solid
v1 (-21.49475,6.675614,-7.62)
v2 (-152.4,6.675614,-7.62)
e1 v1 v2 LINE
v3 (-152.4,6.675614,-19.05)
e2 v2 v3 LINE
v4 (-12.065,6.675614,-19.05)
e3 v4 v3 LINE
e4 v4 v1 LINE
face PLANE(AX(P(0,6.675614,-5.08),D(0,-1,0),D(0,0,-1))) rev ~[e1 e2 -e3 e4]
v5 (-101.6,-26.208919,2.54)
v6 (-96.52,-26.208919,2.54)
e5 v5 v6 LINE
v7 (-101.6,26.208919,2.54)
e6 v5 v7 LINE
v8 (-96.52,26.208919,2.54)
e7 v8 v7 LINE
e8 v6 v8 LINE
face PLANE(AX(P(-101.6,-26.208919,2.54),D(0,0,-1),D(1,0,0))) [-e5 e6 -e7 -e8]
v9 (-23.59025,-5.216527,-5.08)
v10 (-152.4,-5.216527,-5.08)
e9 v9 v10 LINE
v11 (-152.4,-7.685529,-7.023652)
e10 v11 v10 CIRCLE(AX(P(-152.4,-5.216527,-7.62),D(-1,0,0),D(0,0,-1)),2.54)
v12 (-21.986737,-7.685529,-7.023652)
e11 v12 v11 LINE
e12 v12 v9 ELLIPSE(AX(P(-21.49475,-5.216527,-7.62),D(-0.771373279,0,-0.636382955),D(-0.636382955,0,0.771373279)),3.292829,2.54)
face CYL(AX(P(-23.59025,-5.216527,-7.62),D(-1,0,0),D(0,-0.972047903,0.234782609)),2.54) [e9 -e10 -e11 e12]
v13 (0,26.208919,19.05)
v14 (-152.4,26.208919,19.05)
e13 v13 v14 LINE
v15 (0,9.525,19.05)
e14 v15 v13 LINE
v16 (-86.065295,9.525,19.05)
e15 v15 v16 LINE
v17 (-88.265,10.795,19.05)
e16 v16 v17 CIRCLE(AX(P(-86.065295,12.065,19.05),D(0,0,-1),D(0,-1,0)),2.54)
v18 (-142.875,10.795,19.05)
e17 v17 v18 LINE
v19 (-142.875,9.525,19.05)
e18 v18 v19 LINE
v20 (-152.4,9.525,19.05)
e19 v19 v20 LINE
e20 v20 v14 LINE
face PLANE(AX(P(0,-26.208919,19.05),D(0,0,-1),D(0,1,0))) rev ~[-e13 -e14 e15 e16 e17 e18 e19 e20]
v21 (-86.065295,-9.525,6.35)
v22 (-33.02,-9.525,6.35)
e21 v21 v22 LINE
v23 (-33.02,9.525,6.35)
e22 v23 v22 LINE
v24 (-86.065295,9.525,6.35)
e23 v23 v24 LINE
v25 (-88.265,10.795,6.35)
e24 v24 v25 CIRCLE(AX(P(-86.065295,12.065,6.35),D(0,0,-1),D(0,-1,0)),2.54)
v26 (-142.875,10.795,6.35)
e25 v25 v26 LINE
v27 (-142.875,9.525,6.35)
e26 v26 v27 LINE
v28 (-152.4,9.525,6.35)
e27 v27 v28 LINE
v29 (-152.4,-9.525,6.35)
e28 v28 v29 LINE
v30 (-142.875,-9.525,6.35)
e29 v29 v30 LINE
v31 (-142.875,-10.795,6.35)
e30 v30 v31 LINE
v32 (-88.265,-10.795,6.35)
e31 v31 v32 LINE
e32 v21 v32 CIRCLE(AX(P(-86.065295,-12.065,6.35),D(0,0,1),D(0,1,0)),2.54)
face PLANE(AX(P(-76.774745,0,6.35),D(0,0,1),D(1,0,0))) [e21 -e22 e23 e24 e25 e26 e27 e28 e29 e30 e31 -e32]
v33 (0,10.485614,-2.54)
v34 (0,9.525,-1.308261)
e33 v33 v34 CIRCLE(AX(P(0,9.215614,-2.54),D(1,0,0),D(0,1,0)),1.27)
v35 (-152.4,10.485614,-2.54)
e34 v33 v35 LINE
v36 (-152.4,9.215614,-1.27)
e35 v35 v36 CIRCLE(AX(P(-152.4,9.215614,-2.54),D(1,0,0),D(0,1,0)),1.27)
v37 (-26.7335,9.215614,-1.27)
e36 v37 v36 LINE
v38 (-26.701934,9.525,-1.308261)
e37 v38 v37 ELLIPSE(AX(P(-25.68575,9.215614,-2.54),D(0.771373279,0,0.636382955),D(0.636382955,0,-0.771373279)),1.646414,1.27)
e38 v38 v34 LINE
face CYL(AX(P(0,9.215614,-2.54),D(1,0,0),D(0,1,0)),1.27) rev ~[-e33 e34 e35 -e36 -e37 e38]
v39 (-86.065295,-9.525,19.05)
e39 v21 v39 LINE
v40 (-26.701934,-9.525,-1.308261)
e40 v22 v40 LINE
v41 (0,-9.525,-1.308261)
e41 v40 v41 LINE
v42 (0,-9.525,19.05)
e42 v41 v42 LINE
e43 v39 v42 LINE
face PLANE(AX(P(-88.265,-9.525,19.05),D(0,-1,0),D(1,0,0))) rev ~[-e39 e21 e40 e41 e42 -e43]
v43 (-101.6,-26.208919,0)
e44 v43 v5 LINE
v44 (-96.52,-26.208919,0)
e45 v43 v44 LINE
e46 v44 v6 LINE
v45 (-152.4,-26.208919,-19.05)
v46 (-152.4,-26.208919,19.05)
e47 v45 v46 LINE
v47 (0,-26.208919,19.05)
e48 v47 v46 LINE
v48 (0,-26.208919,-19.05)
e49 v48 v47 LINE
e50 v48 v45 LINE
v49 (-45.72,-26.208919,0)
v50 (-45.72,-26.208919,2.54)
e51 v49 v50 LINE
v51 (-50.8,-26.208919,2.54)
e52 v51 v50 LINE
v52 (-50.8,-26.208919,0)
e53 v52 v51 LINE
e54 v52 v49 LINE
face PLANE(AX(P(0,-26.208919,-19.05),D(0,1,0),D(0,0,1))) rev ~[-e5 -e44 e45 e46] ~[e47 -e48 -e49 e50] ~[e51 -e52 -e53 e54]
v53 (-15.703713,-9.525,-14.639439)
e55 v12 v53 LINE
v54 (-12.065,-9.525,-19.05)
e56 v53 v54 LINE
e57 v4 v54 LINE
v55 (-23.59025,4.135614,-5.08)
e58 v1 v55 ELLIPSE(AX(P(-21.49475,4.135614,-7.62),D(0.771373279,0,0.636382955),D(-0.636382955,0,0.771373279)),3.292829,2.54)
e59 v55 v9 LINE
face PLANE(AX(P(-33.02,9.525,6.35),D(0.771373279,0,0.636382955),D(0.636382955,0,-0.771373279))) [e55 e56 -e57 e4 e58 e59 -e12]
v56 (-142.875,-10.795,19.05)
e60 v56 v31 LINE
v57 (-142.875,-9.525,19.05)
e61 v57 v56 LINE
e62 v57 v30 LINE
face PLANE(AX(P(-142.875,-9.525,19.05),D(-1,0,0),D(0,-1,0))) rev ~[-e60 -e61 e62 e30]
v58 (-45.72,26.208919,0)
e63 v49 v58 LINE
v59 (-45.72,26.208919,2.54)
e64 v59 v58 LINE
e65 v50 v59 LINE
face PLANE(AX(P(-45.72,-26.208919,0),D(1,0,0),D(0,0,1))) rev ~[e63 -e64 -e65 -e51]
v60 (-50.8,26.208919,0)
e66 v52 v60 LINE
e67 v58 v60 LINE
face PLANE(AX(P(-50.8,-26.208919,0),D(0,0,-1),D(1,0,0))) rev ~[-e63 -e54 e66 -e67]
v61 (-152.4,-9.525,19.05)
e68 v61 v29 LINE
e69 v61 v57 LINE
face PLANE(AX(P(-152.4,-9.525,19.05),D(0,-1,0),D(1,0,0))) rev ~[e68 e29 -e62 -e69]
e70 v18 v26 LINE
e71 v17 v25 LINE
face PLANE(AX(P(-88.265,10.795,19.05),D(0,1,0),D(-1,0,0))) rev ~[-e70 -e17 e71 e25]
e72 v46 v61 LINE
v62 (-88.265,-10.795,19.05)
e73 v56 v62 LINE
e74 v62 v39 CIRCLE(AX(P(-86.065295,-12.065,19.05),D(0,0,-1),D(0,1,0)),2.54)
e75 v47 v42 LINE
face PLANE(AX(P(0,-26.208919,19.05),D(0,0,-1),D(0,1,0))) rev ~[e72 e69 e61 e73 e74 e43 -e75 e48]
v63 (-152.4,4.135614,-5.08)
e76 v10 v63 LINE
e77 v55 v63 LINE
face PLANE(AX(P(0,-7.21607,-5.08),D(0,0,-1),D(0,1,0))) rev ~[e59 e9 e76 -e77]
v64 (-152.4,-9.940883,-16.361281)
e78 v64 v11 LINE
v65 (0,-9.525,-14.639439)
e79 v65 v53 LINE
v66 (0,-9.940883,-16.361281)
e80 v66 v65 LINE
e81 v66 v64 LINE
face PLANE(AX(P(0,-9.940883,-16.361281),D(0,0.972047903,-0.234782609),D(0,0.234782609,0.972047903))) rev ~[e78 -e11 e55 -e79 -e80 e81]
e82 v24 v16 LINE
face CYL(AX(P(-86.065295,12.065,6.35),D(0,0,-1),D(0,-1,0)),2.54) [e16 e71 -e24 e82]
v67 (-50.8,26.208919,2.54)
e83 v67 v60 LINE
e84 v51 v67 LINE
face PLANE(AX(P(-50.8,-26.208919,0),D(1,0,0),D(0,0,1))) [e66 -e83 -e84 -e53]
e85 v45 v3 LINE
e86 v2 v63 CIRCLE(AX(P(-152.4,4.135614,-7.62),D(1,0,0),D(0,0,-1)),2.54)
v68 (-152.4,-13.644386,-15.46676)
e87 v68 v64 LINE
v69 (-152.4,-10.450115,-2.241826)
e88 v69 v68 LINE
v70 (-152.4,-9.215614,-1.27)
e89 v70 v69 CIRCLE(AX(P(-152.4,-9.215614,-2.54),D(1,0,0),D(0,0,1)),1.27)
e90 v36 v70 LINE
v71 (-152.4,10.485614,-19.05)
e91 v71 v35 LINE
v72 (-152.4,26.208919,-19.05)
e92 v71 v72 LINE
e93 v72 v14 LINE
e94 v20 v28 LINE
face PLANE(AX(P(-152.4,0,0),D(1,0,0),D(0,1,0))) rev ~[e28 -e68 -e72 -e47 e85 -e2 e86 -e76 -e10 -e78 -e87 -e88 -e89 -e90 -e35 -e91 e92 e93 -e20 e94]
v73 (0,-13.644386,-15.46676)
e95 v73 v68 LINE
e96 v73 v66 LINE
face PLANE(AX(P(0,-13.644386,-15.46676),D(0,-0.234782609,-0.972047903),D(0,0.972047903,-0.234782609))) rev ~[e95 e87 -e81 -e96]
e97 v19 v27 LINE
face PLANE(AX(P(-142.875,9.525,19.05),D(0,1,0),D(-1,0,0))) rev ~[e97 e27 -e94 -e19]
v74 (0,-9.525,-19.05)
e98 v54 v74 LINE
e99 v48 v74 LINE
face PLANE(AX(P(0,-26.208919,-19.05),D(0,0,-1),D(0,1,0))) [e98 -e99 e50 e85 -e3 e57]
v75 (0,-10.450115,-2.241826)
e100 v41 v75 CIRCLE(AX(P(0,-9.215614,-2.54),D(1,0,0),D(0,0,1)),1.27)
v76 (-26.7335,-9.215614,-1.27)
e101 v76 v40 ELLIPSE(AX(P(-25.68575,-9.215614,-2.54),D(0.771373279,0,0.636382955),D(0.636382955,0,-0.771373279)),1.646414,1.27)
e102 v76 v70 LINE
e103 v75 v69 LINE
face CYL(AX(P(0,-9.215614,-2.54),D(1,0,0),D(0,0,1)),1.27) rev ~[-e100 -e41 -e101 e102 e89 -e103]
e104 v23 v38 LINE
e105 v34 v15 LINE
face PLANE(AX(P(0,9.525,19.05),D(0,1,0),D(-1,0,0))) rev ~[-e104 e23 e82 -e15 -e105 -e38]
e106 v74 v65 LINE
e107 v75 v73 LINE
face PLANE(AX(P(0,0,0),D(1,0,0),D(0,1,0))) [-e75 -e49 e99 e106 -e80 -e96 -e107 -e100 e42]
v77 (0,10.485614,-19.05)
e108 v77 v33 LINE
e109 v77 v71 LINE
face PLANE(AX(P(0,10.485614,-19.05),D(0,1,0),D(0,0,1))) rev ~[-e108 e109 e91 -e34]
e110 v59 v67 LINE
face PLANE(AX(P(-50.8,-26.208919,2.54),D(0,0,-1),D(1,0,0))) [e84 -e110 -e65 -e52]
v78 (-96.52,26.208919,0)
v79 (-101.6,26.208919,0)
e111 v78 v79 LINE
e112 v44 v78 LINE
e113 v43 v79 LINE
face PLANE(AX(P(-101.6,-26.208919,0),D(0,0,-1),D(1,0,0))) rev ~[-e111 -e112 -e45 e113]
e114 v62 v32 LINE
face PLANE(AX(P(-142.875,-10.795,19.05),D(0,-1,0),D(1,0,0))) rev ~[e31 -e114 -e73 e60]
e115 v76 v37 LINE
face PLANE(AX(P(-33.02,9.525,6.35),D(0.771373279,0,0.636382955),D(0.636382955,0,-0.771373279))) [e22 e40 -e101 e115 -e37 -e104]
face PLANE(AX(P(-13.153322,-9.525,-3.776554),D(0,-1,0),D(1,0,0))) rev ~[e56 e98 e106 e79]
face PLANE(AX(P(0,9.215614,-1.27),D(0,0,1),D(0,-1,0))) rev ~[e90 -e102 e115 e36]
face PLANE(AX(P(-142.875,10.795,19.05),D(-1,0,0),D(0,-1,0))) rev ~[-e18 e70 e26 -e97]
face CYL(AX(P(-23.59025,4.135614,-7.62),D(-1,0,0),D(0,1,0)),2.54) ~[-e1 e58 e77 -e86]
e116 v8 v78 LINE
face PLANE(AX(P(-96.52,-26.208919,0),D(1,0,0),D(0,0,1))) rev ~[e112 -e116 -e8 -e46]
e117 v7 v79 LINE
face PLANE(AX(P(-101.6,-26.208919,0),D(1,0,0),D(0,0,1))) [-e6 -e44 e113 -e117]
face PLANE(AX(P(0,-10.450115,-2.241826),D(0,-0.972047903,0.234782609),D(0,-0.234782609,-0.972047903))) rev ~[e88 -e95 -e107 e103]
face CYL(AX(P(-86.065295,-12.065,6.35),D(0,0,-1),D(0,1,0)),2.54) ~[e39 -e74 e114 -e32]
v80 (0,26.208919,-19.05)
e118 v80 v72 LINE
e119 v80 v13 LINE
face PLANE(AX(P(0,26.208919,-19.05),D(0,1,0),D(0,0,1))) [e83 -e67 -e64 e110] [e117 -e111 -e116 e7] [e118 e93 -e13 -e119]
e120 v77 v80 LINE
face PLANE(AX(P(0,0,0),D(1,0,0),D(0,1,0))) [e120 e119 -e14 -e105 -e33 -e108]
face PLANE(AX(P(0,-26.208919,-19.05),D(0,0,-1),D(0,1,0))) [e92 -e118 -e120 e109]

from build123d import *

# Parameters (mm, degrees)
F0_W         = 52.4178380828
F0_H         = 38.1
F1_DEPTH     = 152.4
F3_DEPTH     = 152.401
F5_DEPTH     = 12.7
F7_DEPTH     = 19.05
F8_W         = 5.08
F8_H         = 2.54
F9_DEPTH     = 52.4188380828
F10_R        = 2.54
F11_T1_DEPTH = 18.199261314


# Not quite as in the source:
# - a fillet or chamfer that OpenCascade refuses, or shapes differently, is made with other operations: its cross-section is extruded or revolved along the edge and cut away or added


with BuildPart() as f1:
    # F0 (on Right) → F1 (new body)
    with BuildSketch(Plane.YZ):
        Rectangle(F0_W, F0_H)
    extrude(amount=-F1_DEPTH)

    # F2 (on face) → F3 (cut, through all)
    with BuildSketch(Plane.YZ):
        with BuildLine():
            Line((6.6756140975, -19.05), (10.4856140975, -19.05))
            Line((10.4856140975, -19.05), (10.4856140975, -2.54))
            ThreePointArc((10.4856140975, -2.54), (10.1136397096, -1.6419743879), (9.2156140975, -1.27))
            Line((9.2156140975, -1.27), (-9.2156140975, -1.27))
            ThreePointArc((-9.2156140975, -1.27), (-10.0011773128, -1.5421070023), (-10.4501149349, -2.241826087))
            Line((-10.4501149349, -2.241826087), (-13.6443859025, -15.4667596303))
            Line((-13.6443859025, -15.4667596303), (-9.9408833902, -16.3612813694))
            Line((-9.9408833902, -16.3612813694), (-7.2160704876, -5.08))
            Line((-7.2160704876, -5.08), (6.6756140975, -5.08))
            Line((6.6756140975, -5.08), (6.6756140975, -19.05))
        make_face()
    extrude(amount=-F3_DEPTH, mode=Mode.SUBTRACT)

    # F4 (on face) → F5 (cut)
    with BuildSketch(Plane.XY.offset(19.05)):
        Polygon((-142.875, -10.795), (-88.265, -10.795), (-88.265, -9.525), (0, -9.525), (0, 9.525), (-88.265, 9.525), (-88.265, 10.795), (-142.875, 10.795), (-142.875, 9.525), (-152.4, 9.525), (-152.4, -9.525), (-142.875, -9.525), align=None)
    extrude(amount=-F5_DEPTH, mode=Mode.SUBTRACT)

    # F6 (on face) → F7 (cut, through all)
    with BuildSketch(Plane.XZ.offset(-9.525)):
        Polygon((0, 6.35), (-33.02, 6.35), (-12.065, -19.05), (0, -19.05), align=None)
    extrude(amount=F7_DEPTH, mode=Mode.SUBTRACT)

    # F8 (on face) → F9 (cut, through all)
    with BuildSketch(Plane.XZ.offset(26.2089190414)):
        with Locations((-99.06, 1.27)):
            Rectangle(F8_W, F8_H)
        with Locations((-48.26, 1.27)):
            Rectangle(F8_W, F8_H)
    extrude(amount=-F9_DEPTH, mode=Mode.SUBTRACT)

    # F10
    f10_edges = [f1.edges().sort_by_distance(p)[0] for p in [
        (-87.995125, -7.21607, -5.08),
        (-87.995125, 6.675614, -5.08),
    ]]
    fillet(f10_edges, radius=F10_R)

    # F11: fillet of radius 2.54 on 2 edges, made by hand

    # F11_s2 → F11_t1 (cut)
    with BuildSketch(Plane.XY.offset(6.35)):
        with BuildLine():
            ThreePointArc((-86.0652954744, -9.525), (-87.3352954744, -9.8652954744), (-88.265, -10.795))
            Line((-88.265, -10.795), (-88.265, -9.525))
            Line((-88.265, -9.525), (-86.0652954744, -9.525))
        make_face()
        with BuildLine():
            ThreePointArc((-86.0652954744, 9.525), (-87.3352954744, 9.8652954744), (-88.265, 10.795))
            Line((-88.265, 10.795), (-88.265, 9.525))
            Line((-88.265, 9.525), (-86.0652954744, 9.525))
        make_face()
    extrude(amount=F11_T1_DEPTH, mode=Mode.SUBTRACT)


solid = f1.part
